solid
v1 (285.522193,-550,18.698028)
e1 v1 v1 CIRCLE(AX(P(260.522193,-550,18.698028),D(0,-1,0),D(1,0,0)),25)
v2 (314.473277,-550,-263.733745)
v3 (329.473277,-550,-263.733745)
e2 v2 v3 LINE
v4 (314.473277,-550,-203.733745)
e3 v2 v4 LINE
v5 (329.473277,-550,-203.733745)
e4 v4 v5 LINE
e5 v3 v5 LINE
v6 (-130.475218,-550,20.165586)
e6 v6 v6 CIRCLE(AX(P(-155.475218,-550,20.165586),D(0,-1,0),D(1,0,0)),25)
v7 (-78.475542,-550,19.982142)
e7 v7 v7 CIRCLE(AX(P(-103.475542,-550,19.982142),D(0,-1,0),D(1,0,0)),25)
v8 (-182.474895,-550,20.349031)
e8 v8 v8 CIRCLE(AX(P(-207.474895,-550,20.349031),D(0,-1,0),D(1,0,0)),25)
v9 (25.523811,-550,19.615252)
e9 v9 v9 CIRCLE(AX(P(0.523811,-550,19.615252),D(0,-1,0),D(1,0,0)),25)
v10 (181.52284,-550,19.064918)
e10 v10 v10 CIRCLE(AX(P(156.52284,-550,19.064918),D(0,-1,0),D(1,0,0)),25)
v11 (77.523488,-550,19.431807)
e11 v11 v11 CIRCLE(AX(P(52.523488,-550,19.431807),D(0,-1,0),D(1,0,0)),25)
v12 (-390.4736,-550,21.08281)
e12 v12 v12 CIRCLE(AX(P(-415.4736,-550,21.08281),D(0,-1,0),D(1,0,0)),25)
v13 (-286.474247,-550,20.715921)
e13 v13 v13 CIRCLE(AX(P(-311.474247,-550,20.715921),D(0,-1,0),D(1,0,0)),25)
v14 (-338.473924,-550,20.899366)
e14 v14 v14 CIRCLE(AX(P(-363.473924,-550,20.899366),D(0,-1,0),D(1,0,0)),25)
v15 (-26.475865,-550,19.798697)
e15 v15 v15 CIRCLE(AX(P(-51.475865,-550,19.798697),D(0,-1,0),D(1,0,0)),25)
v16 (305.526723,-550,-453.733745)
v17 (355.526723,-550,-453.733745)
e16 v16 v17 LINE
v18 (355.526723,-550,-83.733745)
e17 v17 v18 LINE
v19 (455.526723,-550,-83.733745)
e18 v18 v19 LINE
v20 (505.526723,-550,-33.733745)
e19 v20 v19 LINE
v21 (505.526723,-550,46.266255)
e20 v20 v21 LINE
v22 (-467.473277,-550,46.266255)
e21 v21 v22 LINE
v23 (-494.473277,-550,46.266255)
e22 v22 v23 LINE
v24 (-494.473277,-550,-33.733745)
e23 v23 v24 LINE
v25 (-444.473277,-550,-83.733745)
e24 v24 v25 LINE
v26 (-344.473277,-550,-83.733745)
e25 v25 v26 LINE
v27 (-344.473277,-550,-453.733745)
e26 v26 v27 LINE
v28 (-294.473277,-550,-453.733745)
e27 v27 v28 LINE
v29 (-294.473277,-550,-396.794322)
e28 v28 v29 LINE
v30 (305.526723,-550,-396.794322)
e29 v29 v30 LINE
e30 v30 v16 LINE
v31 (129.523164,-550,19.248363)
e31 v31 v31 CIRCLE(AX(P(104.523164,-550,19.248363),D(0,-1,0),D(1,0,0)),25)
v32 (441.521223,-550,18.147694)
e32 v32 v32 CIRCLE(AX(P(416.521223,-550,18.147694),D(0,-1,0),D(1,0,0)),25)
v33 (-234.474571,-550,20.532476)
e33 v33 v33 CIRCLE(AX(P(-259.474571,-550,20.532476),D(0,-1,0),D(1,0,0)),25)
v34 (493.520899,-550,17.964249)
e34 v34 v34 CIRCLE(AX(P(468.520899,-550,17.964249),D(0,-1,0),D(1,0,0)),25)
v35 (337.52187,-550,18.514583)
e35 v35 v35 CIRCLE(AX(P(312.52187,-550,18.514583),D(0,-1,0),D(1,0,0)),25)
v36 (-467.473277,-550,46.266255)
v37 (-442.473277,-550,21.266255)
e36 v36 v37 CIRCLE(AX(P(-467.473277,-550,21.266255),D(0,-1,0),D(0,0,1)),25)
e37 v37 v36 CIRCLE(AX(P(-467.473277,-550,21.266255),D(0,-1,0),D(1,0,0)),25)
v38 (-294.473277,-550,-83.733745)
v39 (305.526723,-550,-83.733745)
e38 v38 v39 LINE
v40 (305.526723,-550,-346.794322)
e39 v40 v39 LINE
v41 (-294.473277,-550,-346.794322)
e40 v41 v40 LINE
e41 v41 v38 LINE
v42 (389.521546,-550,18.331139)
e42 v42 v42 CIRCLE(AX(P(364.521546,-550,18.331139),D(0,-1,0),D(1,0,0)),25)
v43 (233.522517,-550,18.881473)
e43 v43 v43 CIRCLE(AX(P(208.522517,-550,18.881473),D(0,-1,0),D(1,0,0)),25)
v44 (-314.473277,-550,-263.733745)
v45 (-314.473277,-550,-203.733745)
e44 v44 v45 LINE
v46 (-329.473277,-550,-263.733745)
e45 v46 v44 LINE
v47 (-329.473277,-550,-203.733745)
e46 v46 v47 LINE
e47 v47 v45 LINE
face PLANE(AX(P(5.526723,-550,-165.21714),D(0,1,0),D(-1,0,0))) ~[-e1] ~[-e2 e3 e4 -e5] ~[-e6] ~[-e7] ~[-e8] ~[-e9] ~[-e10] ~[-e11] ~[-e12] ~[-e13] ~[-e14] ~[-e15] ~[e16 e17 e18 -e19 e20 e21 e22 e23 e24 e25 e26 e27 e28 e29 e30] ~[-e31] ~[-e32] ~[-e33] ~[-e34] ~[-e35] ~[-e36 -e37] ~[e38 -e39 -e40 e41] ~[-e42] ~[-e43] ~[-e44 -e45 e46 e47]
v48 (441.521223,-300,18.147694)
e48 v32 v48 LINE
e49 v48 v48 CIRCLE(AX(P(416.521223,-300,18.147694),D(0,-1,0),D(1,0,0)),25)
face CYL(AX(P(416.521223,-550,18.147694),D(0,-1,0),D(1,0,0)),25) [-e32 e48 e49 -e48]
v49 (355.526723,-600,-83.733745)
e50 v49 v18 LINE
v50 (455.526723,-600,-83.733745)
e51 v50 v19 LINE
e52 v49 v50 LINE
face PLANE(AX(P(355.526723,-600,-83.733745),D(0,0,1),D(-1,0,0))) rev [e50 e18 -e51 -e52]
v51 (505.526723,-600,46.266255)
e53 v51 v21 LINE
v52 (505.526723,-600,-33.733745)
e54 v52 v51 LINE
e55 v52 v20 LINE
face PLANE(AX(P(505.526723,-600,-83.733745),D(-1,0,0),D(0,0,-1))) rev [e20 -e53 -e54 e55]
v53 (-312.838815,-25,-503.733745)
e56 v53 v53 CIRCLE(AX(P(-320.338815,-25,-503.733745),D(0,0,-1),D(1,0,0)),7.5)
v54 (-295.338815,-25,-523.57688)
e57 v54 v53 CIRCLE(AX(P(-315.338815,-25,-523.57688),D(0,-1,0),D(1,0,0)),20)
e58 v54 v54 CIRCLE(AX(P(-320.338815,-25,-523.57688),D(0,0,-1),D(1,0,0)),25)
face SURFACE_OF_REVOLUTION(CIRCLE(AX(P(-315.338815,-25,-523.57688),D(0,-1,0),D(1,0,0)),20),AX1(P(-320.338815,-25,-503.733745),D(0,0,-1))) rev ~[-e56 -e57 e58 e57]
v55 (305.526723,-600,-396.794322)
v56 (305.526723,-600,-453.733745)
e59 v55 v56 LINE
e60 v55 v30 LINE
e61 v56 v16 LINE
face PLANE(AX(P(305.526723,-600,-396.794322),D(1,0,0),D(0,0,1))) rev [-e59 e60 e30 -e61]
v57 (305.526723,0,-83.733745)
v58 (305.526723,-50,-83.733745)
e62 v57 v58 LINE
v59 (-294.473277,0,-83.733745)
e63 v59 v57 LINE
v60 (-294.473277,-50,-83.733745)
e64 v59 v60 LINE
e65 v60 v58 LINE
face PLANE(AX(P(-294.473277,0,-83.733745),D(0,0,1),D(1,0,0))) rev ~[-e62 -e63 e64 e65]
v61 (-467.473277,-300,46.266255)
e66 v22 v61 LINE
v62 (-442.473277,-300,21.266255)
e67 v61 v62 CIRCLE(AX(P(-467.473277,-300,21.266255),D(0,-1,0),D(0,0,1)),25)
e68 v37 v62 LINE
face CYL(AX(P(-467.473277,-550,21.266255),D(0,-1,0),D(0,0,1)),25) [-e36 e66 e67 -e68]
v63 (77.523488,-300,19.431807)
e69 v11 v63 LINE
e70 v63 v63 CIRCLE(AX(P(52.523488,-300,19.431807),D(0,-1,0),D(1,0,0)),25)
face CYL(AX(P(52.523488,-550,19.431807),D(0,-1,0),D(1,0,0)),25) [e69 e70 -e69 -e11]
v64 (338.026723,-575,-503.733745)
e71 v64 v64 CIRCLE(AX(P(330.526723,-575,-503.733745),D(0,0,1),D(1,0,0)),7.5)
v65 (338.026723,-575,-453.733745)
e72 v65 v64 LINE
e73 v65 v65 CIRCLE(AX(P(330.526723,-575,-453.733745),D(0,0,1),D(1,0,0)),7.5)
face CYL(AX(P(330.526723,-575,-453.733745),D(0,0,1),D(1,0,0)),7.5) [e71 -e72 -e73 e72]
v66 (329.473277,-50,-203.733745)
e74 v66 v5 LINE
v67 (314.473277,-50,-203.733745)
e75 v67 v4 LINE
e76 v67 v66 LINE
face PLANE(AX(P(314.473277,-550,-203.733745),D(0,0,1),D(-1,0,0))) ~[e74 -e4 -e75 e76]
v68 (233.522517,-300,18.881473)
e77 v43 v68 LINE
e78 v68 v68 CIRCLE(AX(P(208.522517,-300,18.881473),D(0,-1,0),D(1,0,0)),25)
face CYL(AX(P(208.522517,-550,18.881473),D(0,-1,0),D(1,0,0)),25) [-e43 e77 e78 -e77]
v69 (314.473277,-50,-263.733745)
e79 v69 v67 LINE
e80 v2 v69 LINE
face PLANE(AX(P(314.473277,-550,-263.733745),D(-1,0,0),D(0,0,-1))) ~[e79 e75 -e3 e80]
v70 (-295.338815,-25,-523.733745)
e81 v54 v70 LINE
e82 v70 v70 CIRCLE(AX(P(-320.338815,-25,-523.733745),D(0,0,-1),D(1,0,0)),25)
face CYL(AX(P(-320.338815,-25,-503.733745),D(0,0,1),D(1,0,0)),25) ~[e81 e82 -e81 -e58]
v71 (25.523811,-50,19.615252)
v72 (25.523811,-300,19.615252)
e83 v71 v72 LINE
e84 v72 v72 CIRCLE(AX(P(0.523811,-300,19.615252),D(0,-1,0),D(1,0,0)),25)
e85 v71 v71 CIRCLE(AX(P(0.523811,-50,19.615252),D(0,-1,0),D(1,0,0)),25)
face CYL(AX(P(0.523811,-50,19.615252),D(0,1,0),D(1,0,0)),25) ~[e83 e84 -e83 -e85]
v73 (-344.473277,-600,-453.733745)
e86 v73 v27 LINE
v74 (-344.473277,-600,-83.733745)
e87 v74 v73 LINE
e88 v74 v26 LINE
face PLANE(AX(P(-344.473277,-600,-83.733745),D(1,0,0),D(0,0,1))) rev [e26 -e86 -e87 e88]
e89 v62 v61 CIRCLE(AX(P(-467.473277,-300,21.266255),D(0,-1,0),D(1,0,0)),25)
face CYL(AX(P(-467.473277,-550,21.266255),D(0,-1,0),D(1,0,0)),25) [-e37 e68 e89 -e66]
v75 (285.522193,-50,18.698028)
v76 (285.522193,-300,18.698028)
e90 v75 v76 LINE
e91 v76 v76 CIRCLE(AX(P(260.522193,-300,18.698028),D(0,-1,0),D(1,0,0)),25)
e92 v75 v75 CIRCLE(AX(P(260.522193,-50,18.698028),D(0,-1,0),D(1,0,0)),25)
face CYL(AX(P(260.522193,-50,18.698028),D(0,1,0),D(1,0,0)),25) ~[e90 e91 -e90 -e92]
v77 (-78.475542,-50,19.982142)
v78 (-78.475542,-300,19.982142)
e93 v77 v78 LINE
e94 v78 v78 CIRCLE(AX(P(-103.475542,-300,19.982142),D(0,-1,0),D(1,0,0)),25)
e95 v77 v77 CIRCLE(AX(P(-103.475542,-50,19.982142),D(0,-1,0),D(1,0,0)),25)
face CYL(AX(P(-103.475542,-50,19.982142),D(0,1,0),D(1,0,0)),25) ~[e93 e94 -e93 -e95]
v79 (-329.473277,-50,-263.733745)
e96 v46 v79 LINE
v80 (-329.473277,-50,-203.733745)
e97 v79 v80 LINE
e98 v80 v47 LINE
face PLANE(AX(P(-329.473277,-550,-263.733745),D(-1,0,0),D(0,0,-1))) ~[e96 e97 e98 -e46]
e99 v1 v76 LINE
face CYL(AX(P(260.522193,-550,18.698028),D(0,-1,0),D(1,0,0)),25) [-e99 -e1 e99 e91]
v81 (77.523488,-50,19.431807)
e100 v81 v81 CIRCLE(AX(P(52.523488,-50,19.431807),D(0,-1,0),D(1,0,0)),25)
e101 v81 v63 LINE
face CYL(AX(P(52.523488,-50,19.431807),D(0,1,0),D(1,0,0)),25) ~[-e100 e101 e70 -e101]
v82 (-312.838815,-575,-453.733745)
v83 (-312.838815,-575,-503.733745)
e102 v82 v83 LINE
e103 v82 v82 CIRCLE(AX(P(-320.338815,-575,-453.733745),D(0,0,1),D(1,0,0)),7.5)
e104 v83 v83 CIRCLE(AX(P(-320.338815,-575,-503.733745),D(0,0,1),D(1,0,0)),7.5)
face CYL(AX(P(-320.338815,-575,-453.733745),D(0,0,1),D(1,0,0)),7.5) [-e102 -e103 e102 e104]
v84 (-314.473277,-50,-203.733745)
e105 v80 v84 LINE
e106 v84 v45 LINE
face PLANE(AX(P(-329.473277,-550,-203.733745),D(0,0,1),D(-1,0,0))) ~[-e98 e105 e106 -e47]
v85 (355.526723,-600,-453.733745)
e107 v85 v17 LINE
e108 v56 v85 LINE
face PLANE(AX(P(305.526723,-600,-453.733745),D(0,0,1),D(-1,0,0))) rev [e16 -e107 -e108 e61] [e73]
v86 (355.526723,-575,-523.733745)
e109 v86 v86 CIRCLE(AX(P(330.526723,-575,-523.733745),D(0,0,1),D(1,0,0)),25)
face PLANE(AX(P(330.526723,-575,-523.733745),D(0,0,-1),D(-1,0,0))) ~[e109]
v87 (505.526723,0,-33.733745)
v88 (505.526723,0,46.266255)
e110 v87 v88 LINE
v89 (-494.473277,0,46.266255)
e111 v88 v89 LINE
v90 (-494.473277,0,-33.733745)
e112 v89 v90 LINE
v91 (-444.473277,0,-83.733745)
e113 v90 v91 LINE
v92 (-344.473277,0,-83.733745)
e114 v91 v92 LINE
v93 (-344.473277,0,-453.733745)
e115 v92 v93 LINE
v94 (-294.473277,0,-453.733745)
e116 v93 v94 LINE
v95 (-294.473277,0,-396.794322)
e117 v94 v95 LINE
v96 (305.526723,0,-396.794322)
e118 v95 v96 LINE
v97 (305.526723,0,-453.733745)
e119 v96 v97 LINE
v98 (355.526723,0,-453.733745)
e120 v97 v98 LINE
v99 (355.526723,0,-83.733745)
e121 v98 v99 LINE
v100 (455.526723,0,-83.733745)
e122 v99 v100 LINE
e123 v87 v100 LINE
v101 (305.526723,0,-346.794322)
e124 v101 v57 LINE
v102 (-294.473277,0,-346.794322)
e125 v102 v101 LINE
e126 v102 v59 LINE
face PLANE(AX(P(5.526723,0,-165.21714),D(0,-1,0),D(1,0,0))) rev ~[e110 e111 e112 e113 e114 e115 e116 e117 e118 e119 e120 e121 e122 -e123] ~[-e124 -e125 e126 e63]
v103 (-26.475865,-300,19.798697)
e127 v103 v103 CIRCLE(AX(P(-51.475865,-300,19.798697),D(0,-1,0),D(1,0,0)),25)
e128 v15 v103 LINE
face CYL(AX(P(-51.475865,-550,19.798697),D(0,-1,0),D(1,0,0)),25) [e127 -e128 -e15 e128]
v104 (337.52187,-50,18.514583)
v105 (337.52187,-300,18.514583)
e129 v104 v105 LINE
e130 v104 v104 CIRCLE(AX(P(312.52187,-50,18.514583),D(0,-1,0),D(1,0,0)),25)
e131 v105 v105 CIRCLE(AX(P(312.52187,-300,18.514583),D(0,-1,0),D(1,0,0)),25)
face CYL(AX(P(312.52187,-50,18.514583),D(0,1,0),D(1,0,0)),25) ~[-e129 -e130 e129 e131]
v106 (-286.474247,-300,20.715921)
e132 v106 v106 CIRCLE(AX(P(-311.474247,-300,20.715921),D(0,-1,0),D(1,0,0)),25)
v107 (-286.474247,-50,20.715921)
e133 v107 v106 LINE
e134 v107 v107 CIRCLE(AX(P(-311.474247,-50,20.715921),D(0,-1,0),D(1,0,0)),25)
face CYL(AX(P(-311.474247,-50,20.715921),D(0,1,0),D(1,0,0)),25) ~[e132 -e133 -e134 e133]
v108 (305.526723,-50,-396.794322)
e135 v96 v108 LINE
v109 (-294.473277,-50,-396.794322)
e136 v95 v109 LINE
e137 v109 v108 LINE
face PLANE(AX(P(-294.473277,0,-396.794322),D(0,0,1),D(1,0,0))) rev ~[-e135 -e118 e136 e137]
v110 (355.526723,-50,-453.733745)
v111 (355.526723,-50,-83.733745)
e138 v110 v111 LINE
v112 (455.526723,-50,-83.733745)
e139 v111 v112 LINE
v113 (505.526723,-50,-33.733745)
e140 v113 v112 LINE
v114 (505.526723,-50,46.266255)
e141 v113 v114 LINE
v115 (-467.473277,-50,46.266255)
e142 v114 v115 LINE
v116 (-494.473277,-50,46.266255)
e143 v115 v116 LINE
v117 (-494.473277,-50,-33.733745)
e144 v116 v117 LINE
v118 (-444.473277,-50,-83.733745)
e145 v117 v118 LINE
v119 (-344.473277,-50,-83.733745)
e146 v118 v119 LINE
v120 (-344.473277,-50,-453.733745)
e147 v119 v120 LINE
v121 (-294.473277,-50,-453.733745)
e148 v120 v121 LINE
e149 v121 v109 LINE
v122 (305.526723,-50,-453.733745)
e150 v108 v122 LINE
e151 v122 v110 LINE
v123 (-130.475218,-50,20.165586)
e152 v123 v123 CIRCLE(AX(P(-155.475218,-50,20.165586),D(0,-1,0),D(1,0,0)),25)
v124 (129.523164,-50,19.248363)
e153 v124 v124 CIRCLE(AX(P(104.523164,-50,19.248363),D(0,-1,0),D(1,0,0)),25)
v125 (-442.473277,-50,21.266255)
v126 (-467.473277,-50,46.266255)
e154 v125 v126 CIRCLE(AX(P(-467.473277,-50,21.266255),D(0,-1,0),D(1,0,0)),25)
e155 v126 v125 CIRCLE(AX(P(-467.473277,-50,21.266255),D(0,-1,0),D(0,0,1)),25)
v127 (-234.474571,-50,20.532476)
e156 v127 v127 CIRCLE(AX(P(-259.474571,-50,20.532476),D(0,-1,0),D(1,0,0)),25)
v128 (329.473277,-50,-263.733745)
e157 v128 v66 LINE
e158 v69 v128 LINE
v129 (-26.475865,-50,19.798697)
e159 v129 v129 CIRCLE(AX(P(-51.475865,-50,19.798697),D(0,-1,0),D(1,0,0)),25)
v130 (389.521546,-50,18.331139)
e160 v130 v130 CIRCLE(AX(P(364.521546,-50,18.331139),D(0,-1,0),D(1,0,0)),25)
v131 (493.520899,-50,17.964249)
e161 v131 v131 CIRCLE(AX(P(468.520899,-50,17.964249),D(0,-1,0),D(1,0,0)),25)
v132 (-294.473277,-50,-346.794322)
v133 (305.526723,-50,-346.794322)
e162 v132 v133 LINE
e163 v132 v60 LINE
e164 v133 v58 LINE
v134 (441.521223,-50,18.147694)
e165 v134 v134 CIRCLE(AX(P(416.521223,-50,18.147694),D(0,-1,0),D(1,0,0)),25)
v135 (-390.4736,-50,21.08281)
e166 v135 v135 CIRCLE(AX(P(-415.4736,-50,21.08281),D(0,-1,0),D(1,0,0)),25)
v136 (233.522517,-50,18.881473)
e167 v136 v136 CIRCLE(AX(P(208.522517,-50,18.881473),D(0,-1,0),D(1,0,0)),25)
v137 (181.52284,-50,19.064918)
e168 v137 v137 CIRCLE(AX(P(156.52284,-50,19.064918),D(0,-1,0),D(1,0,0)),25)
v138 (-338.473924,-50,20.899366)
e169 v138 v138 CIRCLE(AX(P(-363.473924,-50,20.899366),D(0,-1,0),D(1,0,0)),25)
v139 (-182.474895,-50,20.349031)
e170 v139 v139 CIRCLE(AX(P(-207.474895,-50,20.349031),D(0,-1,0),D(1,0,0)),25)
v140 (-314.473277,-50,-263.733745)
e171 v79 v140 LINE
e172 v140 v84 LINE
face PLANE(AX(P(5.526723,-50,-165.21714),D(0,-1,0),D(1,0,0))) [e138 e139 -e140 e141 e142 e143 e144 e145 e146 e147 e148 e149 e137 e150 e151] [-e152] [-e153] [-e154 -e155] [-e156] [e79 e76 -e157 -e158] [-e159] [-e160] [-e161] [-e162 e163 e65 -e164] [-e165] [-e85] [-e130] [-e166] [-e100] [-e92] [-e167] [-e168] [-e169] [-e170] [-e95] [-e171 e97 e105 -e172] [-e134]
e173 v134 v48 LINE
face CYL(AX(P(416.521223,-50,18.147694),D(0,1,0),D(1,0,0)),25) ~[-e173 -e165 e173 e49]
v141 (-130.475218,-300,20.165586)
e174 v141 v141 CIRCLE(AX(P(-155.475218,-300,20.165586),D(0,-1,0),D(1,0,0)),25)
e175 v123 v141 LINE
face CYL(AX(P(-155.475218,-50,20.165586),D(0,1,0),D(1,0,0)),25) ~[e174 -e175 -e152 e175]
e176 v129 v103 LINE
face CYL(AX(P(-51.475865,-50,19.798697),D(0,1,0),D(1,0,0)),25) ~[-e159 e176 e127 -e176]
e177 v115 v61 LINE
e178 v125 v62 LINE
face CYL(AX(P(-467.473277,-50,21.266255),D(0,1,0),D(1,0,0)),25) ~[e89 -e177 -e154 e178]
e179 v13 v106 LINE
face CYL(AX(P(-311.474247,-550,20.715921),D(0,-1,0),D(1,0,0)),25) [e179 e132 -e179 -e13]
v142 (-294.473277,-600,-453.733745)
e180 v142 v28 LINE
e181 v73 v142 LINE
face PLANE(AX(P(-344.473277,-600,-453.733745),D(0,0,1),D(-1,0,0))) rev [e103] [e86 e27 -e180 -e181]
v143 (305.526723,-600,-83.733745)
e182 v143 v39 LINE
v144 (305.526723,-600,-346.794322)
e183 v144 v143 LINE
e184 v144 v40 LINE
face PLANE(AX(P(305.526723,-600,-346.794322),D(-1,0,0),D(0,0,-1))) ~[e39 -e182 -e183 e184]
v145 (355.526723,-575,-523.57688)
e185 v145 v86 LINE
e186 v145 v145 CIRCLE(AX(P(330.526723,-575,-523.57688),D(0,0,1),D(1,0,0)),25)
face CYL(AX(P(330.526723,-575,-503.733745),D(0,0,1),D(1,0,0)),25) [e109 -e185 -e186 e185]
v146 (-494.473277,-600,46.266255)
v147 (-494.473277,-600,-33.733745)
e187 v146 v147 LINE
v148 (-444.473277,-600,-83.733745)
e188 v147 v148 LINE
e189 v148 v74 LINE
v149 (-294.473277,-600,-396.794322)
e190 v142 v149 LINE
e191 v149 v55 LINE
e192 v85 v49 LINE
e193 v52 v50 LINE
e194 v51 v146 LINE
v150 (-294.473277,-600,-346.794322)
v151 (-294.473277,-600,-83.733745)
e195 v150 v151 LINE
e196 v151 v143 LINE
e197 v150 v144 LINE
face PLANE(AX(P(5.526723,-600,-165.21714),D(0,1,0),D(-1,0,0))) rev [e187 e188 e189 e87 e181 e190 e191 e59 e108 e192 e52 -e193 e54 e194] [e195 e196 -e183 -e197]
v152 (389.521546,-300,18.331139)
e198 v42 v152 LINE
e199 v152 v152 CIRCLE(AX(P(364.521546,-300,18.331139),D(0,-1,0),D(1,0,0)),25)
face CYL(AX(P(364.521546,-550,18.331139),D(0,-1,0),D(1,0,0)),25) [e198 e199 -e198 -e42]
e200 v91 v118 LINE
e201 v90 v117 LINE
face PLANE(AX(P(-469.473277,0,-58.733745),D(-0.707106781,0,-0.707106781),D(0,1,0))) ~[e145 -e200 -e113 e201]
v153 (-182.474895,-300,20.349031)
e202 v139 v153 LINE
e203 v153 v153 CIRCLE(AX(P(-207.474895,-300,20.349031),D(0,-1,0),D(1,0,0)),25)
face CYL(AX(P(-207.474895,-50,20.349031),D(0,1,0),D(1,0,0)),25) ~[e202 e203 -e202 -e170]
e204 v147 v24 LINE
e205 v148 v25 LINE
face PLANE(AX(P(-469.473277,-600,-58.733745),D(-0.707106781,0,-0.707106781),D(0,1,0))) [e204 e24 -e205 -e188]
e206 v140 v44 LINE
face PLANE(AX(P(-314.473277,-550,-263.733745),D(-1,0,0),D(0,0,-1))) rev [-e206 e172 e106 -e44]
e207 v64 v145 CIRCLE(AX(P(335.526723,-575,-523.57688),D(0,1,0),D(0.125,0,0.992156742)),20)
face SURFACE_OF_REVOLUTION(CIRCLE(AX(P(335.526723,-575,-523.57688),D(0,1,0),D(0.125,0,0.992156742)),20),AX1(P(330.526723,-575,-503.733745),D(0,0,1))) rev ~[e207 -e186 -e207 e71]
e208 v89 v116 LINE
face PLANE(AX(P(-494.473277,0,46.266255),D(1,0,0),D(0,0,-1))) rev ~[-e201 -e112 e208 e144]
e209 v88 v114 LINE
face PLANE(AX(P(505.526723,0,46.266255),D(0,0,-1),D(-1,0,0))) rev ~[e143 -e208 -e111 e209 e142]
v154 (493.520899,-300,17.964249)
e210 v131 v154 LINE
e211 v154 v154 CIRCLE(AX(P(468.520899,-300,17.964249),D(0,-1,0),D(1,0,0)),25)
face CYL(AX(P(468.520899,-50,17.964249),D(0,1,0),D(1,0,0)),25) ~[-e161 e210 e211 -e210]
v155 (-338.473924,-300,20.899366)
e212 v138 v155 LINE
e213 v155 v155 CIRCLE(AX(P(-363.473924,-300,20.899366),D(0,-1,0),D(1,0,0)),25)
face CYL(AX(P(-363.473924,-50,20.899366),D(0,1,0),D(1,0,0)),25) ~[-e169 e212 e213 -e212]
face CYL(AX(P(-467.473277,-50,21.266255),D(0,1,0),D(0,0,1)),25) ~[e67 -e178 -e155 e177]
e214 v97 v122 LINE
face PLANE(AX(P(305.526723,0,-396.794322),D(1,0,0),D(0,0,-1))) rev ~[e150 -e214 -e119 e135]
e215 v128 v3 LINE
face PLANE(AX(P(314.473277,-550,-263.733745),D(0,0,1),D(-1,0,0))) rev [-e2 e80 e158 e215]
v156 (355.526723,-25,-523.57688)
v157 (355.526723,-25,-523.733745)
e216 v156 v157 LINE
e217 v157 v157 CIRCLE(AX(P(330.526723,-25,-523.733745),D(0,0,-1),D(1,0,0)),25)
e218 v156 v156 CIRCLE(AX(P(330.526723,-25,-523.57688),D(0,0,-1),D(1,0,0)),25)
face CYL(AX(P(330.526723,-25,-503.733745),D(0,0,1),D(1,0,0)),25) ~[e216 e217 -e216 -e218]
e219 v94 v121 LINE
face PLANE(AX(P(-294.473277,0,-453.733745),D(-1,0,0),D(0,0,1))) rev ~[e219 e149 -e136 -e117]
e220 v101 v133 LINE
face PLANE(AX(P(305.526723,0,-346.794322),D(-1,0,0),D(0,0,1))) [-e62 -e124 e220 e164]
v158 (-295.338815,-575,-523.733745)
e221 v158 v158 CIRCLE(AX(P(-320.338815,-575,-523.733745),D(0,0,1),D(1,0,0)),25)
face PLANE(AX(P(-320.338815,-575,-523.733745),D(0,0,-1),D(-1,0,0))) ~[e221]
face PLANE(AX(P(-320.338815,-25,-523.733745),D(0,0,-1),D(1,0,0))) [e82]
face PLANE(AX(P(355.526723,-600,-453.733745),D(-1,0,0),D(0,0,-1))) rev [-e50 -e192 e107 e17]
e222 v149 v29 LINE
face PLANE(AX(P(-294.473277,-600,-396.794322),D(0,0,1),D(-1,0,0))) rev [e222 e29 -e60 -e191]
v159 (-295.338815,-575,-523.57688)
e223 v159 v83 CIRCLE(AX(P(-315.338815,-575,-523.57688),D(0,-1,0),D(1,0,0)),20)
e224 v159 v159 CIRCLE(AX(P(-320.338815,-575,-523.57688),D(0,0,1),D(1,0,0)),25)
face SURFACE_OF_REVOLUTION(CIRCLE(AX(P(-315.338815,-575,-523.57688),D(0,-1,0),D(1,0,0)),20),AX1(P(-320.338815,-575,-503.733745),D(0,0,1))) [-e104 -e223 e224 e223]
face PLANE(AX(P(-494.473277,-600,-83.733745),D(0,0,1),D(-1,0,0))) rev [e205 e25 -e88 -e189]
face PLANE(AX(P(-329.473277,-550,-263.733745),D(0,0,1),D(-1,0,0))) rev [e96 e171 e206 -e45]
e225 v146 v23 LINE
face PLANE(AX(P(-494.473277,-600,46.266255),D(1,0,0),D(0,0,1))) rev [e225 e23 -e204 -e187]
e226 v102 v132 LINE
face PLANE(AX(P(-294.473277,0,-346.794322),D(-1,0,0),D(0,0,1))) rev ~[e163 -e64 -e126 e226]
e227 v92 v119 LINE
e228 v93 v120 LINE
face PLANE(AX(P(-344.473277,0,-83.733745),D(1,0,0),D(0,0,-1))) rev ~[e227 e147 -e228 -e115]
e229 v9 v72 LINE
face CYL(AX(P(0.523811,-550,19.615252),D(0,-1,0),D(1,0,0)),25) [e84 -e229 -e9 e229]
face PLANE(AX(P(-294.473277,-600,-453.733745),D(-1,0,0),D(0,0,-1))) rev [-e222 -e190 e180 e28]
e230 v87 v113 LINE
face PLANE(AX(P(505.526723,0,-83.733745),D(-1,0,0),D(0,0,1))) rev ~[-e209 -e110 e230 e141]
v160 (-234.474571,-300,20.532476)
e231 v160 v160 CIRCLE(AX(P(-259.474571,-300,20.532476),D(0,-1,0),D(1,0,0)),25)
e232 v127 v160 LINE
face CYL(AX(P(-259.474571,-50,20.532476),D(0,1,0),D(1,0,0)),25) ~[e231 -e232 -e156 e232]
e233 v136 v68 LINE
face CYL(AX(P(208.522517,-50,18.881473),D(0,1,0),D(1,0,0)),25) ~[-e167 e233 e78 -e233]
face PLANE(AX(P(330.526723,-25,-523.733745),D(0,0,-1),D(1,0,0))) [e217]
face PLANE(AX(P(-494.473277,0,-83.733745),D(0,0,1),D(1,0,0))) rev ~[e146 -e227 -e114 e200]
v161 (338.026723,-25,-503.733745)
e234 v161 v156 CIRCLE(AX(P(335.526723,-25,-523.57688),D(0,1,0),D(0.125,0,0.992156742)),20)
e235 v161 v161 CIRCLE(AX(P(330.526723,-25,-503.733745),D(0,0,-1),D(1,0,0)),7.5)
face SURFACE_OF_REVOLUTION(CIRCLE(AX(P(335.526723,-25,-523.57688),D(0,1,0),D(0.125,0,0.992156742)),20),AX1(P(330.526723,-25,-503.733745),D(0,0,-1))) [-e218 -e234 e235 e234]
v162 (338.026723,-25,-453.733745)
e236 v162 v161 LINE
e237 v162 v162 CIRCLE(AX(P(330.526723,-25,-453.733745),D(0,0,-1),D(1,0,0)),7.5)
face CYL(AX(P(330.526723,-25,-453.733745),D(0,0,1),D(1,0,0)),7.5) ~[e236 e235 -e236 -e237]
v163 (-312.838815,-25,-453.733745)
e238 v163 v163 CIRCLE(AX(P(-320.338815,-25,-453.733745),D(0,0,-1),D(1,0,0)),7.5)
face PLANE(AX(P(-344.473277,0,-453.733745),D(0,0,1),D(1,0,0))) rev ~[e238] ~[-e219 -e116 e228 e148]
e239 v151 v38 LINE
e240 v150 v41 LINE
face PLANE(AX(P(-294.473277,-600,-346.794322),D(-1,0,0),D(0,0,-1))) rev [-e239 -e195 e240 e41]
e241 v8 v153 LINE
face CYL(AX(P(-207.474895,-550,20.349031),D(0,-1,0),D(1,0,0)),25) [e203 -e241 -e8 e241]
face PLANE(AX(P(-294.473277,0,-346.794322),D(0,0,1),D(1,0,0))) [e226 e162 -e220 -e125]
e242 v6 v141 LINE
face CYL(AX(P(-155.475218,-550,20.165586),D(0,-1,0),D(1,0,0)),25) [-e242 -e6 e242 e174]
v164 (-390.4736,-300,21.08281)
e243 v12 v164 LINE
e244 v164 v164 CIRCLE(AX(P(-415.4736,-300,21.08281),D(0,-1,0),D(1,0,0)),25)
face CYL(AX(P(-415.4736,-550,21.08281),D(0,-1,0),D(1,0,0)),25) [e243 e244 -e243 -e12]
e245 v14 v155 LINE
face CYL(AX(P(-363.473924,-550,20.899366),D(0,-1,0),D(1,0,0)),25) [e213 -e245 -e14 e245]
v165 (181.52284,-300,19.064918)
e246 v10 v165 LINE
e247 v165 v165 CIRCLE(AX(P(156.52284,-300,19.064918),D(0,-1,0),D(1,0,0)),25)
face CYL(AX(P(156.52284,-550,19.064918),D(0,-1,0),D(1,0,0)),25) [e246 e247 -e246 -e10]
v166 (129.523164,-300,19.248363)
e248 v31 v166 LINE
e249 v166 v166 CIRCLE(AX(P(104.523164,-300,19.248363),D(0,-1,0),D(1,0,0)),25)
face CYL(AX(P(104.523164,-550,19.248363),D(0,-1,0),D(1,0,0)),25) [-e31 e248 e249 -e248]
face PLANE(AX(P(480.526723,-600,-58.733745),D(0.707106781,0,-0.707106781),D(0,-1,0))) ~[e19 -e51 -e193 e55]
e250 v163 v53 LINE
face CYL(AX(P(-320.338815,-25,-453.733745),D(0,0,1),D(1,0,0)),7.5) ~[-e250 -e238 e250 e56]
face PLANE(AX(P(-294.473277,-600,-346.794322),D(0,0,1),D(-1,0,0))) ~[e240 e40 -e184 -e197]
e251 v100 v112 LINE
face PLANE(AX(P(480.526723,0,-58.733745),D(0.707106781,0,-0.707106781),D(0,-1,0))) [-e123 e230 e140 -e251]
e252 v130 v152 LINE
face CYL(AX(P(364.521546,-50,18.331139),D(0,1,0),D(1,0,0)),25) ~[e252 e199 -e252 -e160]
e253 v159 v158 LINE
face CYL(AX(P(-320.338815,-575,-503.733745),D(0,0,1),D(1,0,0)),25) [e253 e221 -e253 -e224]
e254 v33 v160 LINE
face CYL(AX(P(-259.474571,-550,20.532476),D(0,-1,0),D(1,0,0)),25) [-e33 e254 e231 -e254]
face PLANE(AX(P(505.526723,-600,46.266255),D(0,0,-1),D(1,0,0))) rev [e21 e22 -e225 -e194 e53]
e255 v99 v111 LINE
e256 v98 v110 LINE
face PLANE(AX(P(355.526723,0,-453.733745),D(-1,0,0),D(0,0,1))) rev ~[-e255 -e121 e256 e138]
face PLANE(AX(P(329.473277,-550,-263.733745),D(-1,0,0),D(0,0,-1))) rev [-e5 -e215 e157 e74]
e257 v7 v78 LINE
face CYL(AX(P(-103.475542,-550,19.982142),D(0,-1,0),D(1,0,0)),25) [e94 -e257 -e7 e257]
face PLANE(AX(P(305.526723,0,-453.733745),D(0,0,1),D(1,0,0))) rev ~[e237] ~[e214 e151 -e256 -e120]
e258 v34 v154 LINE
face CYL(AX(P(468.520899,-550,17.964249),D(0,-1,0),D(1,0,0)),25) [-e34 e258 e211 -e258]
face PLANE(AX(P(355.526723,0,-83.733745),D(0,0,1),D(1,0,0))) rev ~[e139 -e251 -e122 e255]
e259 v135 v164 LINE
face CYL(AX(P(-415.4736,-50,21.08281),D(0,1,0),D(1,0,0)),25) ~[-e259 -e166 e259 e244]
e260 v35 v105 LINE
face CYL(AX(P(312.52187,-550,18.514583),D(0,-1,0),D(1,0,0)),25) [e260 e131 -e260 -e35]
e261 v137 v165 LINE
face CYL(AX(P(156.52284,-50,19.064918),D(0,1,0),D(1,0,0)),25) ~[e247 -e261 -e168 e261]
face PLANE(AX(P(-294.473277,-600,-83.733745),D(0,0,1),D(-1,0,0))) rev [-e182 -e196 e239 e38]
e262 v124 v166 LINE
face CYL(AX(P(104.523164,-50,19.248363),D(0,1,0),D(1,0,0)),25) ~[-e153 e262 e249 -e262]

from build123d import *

# Parameters (mm, degrees)
F0_W      = 600
F0_H      = 263.0605769157
F1_DEPTH  = 50
F2_SIZE   = 50
F3_SIZE   = 50
F4_R      = 25
F5_DEPTH  = 250
F6_R      = 7.5
F7_DEPTH  = 50
F8_W      = 15
F8_H      = 60
F9_DEPTH  = 250
F10_R     = 25
F10_R_2   = 7.5
F11_DEPTH = 20


# Not quite as in the source:
# - a fillet or chamfer that OpenCascade refuses, or shapes differently, is made with other operations: its cross-section is extruded or revolved along the edge and cut away or added


with BuildPart() as f1:
    # F0 (on Front) → F1 (new body)
    with BuildSketch(Plane.XZ):
        Polygon((505.5267233402, 46.2662550807), (-494.4732766598, 46.2662550807), (-494.4732766598, -83.7337449193), (-344.4732766598, -83.7337449193), (-344.4732766598, -453.7337449193), (-294.4732766598, -453.7337449193), (-294.4732766598, -396.794321835), (305.5267233402, -396.794321835), (305.5267233402, -453.7337449193), (355.5267233402, -453.7337449193), (355.5267233402, -83.7337449193), (505.5267233402, -83.7337449193), align=None)
        with Locations((5.5267233402, -215.2640333772)):
            Rectangle(F0_W, F0_H, mode=Mode.SUBTRACT)
    extrude(amount=F1_DEPTH)

    # F2
    f2_edges = [f1.edges().sort_by_distance(p)[0] for p in [
        (505.526723, -25, -83.733745),
    ]]
    chamfer(f2_edges, length=F2_SIZE)

    # F3
    f3_edges = [f1.edges().sort_by_distance(p)[0] for p in [
        (-494.473277, -25, -83.733745),
    ]]
    chamfer(f3_edges, length=F3_SIZE)

    # F4 (on face) → F5 (join)
    with BuildSketch(Plane.XZ.offset(50)):
        with BuildLine():
            ThreePointArc((-467.4732766598, 46.2662550807), (-485.1509461895, 3.588585551), (-442.4732766598, 21.2662550807))
            ThreePointArc((-442.4732766598, 21.2662550807), (-449.7956071302, 38.9439246104), (-467.4732766598, 46.2662550807))
        make_face()
        with Locations((-415.4736002376, 21.0828103085)):
            Circle(F4_R)
        with Locations((-363.4739238154, 20.8993655363)):
            Circle(F4_R)
        with Locations((-311.4742473932, 20.7159207642)):
            Circle(F4_R)
        with Locations((-259.474570971, 20.532475992)):
            Circle(F4_R)
        with Locations((-207.4748945487, 20.3490312198)):
            Circle(F4_R)
        with Locations((-155.4752181265, 20.1655864476)):
            Circle(F4_R)
        with Locations((-103.4755417043, 19.9821416755)):
            Circle(F4_R)
        with Locations((-51.4758652821, 19.7986969033)):
            Circle(F4_R)
        with Locations((0.5238111401, 19.6152521311)):
            Circle(F4_R)
        with Locations((52.5234875624, 19.4318073589)):
            Circle(F4_R)
        with Locations((104.5231639846, 19.2483625868)):
            Circle(F4_R)
        with Locations((156.5228404068, 19.0649178146)):
            Circle(F4_R)
        with Locations((208.522516829, 18.8814730424)):
            Circle(F4_R)
        with Locations((260.5221932512, 18.6980282702)):
            Circle(F4_R)
        with Locations((312.5218696735, 18.5145834981)):
            Circle(F4_R)
        with Locations((364.5215460957, 18.3311387259)):
            Circle(F4_R)
        with Locations((416.5212225179, 18.1476939537)):
            Circle(F4_R)
        with Locations((468.5208989401, 17.9642491815)):
            Circle(F4_R)
    extrude(amount=F5_DEPTH)

    # F6 (on face) → F7 (join)
    with BuildSketch(Plane(origin=(0, 0, -453.7337449193), x_dir=(1, 0, 0), z_dir=(0, 0, -1))):
        with Locations((-320.3388154507, 25)):
            Circle(F6_R)
        with Locations((330.5267233402, 25)):
            Circle(F6_R)
    extrude(amount=F7_DEPTH)

    # F8 (on face) → F9 (join)
    with BuildSketch(Plane.XZ.offset(50)):
        with Locations((-321.9732766598, -233.7337449193)):
            Rectangle(F8_W, F8_H)
        with Locations((321.9732766598, -233.7337449193)):
            Rectangle(F8_W, F8_H)
    extrude(amount=F9_DEPTH)

    # F10 (on face) → F11 (join)
    with BuildSketch(Plane(origin=(0, 0, -503.7337449193), x_dir=(1, 0, 0), z_dir=(0, 0, -1))):
        with Locations((-320.3388154507, 25)):
            Circle(F10_R)
        with Locations((-320.3388154507, 25)):
            Circle(F10_R_2, mode=Mode.SUBTRACT)
        with Locations((-320.3388154507, 25)):
            Circle(F10_R_2)
        with Locations((330.5267233402, 25)):
            Circle(F10_R)
    extrude(amount=F11_DEPTH)

    # F12: fillet of radius 20 on 2 edges, made by hand

    # F12_s1 → F12_t2 (revolve, cut)
    with BuildSketch(Plane.XZ.offset(25)):
        with BuildLine():
            ThreePointArc((-295.3388154507, -523.5768797523), (-300.3388154507, -510.348123197), (-312.8388154507, -503.7337449193))
            Line((-312.8388154507, -503.7337449193), (-295.3388154507, -503.7337449193))
            Line((-295.3388154507, -503.7337449193), (-295.3388154507, -523.5768797523))
        make_face()
    revolve(axis=Axis((-320.3388154507, -25, -503.7337449193), (0, 0, -1)), mode=Mode.SUBTRACT)

    # F12_s3 → F12_t4 (revolve, cut)
    with BuildSketch(Plane.XZ.offset(25)):
        with BuildLine():
            ThreePointArc((338.0267233402, -503.7337449193), (350.5267233402, -510.348123197), (355.5267233402, -523.5768797523))
            Line((355.5267233402, -523.5768797523), (355.5267233402, -503.7337449193))
            Line((355.5267233402, -503.7337449193), (338.0267233402, -503.7337449193))
        make_face()
    revolve(axis=Axis((330.5267233402, -25, -503.7337449193), (0, 0, -1)), mode=Mode.SUBTRACT)

    # F13: F1 across face


with BuildPart() as f1_1:
    add(f1.part)
    add(f1.part.mirror(Plane(origin=(104.5231639846, -300, 19.2483625868), x_dir=(1, 0, 0), z_dir=(0, -1, 0))))


solid = f1_1.part
